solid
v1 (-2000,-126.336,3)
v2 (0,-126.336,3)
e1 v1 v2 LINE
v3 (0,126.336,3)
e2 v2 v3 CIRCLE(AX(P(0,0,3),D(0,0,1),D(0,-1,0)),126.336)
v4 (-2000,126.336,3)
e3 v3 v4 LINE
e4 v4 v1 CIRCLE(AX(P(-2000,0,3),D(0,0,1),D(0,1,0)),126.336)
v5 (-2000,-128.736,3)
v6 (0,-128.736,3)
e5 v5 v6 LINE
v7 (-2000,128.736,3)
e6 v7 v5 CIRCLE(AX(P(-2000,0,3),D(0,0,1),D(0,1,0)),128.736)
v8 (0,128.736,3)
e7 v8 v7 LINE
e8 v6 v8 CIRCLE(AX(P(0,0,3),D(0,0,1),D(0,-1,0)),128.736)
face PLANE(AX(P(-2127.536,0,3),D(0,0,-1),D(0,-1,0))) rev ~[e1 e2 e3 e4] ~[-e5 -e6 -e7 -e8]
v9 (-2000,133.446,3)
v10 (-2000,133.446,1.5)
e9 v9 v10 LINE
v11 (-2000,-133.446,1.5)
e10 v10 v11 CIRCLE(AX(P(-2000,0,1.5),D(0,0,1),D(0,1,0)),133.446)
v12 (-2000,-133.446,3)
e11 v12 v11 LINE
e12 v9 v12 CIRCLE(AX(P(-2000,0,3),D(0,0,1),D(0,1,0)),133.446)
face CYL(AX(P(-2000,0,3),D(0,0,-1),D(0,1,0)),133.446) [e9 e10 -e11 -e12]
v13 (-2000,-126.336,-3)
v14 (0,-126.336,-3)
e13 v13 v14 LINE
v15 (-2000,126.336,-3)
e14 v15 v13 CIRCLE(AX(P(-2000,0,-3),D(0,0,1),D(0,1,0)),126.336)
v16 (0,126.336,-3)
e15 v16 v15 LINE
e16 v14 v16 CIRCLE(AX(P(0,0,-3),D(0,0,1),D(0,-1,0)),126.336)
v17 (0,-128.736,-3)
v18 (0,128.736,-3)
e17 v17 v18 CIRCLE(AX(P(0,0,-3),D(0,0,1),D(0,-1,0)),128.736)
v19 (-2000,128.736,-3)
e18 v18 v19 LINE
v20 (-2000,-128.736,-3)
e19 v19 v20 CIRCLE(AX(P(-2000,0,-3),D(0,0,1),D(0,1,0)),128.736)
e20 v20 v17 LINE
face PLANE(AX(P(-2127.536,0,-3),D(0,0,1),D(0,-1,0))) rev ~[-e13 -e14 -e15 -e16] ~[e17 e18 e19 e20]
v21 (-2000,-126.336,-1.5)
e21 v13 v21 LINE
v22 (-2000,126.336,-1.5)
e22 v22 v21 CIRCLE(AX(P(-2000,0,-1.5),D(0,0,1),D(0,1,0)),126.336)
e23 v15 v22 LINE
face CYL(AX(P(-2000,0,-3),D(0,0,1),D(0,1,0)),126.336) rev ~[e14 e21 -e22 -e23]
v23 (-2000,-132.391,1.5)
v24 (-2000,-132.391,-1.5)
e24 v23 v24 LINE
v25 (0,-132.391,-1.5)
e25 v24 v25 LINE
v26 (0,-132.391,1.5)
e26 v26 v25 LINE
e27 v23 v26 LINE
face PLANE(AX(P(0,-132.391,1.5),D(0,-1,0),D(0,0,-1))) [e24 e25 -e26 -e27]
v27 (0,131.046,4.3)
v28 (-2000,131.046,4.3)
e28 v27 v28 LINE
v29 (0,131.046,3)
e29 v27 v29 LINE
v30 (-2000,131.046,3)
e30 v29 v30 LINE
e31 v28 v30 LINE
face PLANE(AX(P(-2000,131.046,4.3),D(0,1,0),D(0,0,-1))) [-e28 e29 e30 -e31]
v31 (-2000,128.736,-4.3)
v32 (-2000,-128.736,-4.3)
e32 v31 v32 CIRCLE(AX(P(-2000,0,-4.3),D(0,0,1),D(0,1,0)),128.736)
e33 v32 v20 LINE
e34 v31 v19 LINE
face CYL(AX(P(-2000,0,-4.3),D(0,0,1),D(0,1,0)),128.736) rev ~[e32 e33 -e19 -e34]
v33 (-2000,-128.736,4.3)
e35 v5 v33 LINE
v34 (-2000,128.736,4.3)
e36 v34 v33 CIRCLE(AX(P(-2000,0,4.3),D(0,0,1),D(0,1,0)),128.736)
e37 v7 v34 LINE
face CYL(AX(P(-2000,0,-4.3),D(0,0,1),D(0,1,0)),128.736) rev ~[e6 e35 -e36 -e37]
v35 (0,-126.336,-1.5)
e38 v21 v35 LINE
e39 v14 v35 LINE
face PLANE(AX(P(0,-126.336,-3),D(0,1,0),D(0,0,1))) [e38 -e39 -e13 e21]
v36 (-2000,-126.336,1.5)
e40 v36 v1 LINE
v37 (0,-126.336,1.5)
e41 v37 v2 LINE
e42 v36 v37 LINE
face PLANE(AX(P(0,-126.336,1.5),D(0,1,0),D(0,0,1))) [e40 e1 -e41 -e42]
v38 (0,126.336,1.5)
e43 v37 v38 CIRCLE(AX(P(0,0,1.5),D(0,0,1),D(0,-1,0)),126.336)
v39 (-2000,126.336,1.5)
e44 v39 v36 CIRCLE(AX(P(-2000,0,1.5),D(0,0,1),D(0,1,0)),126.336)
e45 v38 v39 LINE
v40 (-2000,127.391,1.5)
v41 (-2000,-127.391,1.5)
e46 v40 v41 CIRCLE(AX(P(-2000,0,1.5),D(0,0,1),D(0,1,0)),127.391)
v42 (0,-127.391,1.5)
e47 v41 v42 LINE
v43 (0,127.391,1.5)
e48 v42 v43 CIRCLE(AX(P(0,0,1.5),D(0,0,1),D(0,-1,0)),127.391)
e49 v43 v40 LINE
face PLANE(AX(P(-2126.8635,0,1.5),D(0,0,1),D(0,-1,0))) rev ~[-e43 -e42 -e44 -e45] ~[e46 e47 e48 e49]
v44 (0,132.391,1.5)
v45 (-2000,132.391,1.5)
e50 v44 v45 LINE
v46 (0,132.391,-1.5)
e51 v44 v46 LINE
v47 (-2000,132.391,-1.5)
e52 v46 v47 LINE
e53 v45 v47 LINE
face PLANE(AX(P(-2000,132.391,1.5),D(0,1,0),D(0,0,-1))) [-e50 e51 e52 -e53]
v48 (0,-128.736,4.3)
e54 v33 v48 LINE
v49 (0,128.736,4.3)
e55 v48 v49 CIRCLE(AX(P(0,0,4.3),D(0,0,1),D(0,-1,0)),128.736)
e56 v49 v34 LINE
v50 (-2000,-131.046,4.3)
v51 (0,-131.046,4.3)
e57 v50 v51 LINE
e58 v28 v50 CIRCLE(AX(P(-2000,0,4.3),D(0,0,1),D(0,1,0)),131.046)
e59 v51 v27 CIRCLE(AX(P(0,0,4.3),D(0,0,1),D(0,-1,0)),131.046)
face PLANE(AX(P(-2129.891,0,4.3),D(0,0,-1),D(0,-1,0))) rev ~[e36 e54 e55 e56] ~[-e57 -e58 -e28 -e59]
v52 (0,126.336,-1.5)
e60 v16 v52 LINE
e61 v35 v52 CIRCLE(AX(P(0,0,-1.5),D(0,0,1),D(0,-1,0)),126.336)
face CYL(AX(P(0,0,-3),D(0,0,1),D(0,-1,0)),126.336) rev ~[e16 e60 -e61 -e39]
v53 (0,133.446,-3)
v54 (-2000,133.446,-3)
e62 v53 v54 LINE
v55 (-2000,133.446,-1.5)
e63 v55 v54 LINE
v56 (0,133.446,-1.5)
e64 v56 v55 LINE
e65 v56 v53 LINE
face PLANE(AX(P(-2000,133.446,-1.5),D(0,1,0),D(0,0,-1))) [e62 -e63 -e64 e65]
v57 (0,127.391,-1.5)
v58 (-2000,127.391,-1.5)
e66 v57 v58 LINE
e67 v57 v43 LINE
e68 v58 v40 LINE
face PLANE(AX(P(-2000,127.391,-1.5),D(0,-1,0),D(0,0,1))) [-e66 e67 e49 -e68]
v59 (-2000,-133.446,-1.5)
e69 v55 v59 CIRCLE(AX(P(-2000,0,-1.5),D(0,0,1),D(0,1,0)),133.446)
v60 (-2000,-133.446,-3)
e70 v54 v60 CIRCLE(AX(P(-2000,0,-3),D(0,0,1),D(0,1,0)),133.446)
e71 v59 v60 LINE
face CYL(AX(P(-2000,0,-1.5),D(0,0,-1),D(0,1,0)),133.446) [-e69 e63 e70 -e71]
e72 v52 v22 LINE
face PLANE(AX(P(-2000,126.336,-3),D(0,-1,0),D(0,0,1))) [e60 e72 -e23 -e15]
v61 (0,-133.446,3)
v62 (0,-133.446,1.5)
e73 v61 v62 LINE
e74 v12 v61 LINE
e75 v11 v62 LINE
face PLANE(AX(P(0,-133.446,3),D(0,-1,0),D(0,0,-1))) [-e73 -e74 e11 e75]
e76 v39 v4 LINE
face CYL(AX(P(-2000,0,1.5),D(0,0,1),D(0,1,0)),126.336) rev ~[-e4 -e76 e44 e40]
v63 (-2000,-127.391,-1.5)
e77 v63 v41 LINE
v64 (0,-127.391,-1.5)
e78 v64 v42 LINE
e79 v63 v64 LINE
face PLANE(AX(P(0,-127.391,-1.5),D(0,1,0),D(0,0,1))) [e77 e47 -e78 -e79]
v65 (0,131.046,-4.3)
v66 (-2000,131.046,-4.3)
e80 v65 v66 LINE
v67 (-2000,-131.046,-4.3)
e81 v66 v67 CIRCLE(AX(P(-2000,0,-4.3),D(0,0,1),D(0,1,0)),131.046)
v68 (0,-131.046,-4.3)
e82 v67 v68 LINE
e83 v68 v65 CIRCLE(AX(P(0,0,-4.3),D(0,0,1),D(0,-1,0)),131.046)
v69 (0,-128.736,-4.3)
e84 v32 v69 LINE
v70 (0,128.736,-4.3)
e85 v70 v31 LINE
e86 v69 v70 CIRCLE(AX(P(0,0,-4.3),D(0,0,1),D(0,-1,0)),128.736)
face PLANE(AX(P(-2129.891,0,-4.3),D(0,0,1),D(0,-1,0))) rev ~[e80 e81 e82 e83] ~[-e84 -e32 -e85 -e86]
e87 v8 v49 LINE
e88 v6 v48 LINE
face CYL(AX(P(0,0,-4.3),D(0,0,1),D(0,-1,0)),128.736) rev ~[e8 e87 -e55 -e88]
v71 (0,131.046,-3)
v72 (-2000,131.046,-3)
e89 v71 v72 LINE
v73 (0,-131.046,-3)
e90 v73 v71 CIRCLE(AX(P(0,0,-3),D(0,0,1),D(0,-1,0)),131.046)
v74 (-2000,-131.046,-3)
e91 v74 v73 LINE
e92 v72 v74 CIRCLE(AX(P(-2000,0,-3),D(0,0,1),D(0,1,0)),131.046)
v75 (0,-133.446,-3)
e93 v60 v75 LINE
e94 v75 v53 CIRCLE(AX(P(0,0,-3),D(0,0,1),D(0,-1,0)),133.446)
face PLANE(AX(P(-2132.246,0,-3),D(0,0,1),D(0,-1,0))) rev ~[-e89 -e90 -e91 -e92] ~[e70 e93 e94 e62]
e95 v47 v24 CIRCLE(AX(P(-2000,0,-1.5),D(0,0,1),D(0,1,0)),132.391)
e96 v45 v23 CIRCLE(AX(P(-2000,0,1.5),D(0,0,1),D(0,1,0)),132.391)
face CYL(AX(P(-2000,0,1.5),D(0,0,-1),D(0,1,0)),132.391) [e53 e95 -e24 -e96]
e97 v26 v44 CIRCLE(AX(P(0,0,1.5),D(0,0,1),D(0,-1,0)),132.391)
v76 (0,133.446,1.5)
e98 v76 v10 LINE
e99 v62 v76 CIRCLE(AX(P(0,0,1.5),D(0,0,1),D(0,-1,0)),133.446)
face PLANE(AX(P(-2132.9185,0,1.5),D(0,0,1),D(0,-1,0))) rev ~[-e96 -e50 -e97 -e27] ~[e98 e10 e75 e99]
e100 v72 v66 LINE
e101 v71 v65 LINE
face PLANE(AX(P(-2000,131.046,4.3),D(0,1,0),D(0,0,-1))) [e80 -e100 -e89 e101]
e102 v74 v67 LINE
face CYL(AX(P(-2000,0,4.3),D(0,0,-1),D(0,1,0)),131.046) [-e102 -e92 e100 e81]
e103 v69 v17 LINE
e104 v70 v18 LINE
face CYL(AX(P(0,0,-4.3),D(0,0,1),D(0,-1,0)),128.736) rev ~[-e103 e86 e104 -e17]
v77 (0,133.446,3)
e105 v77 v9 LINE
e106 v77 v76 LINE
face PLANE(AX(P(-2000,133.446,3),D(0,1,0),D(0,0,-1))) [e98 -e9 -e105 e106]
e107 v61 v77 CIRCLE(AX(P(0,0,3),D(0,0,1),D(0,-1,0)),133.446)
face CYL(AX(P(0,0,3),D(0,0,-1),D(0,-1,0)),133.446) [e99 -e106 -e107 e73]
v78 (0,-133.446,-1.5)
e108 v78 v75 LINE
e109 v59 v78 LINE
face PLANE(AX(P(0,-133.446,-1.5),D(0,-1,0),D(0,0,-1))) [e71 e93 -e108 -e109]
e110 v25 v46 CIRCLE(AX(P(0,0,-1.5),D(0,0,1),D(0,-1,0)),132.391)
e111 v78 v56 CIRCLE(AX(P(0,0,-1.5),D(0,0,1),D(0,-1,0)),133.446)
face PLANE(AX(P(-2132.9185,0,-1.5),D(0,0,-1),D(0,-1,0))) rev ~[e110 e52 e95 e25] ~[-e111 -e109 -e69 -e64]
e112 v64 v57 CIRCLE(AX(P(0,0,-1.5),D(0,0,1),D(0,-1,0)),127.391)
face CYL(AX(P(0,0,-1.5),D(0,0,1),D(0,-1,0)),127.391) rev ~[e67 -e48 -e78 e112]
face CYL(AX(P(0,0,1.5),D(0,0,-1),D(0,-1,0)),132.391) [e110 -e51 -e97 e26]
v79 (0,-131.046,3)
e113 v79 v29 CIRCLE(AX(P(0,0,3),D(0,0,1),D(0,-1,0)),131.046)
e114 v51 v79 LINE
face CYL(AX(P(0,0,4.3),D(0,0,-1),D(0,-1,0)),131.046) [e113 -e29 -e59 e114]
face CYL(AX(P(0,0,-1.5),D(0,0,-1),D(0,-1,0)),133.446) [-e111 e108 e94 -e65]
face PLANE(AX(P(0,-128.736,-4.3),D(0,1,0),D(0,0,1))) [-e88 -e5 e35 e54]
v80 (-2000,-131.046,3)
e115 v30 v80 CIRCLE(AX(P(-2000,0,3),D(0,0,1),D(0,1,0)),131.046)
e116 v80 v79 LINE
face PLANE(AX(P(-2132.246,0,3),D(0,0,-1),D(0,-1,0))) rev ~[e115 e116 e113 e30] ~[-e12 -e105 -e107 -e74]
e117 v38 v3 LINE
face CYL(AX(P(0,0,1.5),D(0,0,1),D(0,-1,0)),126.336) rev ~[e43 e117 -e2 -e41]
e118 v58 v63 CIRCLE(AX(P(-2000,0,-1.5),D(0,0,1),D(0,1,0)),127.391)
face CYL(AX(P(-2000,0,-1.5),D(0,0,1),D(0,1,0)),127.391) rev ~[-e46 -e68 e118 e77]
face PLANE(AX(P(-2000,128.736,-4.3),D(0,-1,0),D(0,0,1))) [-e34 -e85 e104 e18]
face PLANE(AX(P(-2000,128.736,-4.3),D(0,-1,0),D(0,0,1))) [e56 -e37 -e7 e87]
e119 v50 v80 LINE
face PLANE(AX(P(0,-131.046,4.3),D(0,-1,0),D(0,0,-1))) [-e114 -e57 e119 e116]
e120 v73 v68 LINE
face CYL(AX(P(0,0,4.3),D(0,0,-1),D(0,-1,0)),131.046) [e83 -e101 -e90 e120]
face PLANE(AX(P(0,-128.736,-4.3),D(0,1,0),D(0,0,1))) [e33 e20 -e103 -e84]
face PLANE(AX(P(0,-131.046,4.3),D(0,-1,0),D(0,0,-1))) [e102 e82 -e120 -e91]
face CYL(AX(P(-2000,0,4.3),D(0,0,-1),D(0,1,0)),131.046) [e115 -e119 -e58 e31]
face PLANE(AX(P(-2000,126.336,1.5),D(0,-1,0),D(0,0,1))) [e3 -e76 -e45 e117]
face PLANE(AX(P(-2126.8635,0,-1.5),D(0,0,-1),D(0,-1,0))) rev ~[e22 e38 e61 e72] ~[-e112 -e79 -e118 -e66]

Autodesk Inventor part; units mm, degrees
ref_plane "Plano de trabajo2" through (-2000, 0, 0) normal (-1, 0, 0) x (0, 0, 1)
ref_plane "Plano de trabajo3" through (0, 0, 0) normal (-1, 0, 0) x (0, 0, 1)
sketch "Trayectoria" plane through (0, 0, 0) normal (0, 0, 1) x (1, 0, 0)
  arc A0 (-2000, 129.891) -> (-2000, -129.891) centre (-2000, 0) ccw
  arc A1 (0, -129.891) -> (0, 129.891) centre (0, 0) ccw
  line L0 (0, -129.891) -> (-2000, -129.891)
  line L1 (-2000, 129.891) -> (0, 129.891)
  dimension "d31" = 7.11
ref_plane "Plano de sección" through (-2000, -129.891, 0) normal (1, 0, 0) x (0, 0, 1)
sketch "Boceto de sección" plane through (-2000, -129.891, 0) normal (1, 0, 0) x (0, 0, 1)
  line L0 (-4.3, -1.155) -> (4.3, -1.155)
  line L1 (4.3, -1.155) -> (4.3, 1.155)
  line L2 (4.3, 1.155) -> (-4.3, 1.155)
  line L3 (-4.3, 1.155) -> (-4.3, -1.155)
  line L4 (-1.5, -2.5) -> (1.5, -2.5)
  line L5 (1.5, -2.5) -> (1.5, 2.5)
  line L6 (1.5, 2.5) -> (-1.5, 2.5)
  line L7 (-1.5, 2.5) -> (-1.5, -2.5)
  line L8 (-1.5, 0) -> (1.5, 0) construction
  line L9 (-3, -3.555) -> (-1.5, -3.555)
  line L10 (-1.5, -3.555) -> (-1.5, 3.555)
  line L11 (-1.5, 3.555) -> (-3, 3.555)
  line L12 (-3, 3.555) -> (-3, -3.555)
  line L13 (1.5, -3.555) -> (3, -3.555)
  line L14 (3, -3.555) -> (3, 3.555)
  line L15 (3, 3.555) -> (1.5, 3.555)
  line L16 (1.5, 3.555) -> (1.5, -3.555)
  line L17 (-4.3, 0) -> (4.3, 0) construction
  point P0 (0, 0)
  point P1 (0, 0)
  dimension "d21" = 2.31
  dimension "d22" = 5
  dimension "d23" = 3
  dimension "d24" = 1.5
  dimension "d31" = 7.11
  dimension "d32" = 8.6
sweep "Sólido" add profiles "Boceto de sección" path "Trayectoria"
pattern_of_one "Strand Pattern"
equation "\"d21\" = da_d2"
equation "\"d22\" = da_d1"
equation "\"d23\" = da_b1"
equation "\"d24\" = da_t1 + da_t2"
equation "\"d30\" = da_pt"
equation "\"da_p\" = 8"
equation "\"da_b1\" = 3"
equation "\"da_h2\" = 7.11"
equation "\"da_h3\" = 7.11"
equation "\"da_d1\" = 5"
equation "\"da_d2\" = 2.31"
equation "\"da_pt\" = 5.64"
equation "\"da_b\" = 8.6"
equation "\"da_t1\" = 0.75"
equation "\"da_t2\" = 0.75"
properties part number "Cadena de rodillos"
